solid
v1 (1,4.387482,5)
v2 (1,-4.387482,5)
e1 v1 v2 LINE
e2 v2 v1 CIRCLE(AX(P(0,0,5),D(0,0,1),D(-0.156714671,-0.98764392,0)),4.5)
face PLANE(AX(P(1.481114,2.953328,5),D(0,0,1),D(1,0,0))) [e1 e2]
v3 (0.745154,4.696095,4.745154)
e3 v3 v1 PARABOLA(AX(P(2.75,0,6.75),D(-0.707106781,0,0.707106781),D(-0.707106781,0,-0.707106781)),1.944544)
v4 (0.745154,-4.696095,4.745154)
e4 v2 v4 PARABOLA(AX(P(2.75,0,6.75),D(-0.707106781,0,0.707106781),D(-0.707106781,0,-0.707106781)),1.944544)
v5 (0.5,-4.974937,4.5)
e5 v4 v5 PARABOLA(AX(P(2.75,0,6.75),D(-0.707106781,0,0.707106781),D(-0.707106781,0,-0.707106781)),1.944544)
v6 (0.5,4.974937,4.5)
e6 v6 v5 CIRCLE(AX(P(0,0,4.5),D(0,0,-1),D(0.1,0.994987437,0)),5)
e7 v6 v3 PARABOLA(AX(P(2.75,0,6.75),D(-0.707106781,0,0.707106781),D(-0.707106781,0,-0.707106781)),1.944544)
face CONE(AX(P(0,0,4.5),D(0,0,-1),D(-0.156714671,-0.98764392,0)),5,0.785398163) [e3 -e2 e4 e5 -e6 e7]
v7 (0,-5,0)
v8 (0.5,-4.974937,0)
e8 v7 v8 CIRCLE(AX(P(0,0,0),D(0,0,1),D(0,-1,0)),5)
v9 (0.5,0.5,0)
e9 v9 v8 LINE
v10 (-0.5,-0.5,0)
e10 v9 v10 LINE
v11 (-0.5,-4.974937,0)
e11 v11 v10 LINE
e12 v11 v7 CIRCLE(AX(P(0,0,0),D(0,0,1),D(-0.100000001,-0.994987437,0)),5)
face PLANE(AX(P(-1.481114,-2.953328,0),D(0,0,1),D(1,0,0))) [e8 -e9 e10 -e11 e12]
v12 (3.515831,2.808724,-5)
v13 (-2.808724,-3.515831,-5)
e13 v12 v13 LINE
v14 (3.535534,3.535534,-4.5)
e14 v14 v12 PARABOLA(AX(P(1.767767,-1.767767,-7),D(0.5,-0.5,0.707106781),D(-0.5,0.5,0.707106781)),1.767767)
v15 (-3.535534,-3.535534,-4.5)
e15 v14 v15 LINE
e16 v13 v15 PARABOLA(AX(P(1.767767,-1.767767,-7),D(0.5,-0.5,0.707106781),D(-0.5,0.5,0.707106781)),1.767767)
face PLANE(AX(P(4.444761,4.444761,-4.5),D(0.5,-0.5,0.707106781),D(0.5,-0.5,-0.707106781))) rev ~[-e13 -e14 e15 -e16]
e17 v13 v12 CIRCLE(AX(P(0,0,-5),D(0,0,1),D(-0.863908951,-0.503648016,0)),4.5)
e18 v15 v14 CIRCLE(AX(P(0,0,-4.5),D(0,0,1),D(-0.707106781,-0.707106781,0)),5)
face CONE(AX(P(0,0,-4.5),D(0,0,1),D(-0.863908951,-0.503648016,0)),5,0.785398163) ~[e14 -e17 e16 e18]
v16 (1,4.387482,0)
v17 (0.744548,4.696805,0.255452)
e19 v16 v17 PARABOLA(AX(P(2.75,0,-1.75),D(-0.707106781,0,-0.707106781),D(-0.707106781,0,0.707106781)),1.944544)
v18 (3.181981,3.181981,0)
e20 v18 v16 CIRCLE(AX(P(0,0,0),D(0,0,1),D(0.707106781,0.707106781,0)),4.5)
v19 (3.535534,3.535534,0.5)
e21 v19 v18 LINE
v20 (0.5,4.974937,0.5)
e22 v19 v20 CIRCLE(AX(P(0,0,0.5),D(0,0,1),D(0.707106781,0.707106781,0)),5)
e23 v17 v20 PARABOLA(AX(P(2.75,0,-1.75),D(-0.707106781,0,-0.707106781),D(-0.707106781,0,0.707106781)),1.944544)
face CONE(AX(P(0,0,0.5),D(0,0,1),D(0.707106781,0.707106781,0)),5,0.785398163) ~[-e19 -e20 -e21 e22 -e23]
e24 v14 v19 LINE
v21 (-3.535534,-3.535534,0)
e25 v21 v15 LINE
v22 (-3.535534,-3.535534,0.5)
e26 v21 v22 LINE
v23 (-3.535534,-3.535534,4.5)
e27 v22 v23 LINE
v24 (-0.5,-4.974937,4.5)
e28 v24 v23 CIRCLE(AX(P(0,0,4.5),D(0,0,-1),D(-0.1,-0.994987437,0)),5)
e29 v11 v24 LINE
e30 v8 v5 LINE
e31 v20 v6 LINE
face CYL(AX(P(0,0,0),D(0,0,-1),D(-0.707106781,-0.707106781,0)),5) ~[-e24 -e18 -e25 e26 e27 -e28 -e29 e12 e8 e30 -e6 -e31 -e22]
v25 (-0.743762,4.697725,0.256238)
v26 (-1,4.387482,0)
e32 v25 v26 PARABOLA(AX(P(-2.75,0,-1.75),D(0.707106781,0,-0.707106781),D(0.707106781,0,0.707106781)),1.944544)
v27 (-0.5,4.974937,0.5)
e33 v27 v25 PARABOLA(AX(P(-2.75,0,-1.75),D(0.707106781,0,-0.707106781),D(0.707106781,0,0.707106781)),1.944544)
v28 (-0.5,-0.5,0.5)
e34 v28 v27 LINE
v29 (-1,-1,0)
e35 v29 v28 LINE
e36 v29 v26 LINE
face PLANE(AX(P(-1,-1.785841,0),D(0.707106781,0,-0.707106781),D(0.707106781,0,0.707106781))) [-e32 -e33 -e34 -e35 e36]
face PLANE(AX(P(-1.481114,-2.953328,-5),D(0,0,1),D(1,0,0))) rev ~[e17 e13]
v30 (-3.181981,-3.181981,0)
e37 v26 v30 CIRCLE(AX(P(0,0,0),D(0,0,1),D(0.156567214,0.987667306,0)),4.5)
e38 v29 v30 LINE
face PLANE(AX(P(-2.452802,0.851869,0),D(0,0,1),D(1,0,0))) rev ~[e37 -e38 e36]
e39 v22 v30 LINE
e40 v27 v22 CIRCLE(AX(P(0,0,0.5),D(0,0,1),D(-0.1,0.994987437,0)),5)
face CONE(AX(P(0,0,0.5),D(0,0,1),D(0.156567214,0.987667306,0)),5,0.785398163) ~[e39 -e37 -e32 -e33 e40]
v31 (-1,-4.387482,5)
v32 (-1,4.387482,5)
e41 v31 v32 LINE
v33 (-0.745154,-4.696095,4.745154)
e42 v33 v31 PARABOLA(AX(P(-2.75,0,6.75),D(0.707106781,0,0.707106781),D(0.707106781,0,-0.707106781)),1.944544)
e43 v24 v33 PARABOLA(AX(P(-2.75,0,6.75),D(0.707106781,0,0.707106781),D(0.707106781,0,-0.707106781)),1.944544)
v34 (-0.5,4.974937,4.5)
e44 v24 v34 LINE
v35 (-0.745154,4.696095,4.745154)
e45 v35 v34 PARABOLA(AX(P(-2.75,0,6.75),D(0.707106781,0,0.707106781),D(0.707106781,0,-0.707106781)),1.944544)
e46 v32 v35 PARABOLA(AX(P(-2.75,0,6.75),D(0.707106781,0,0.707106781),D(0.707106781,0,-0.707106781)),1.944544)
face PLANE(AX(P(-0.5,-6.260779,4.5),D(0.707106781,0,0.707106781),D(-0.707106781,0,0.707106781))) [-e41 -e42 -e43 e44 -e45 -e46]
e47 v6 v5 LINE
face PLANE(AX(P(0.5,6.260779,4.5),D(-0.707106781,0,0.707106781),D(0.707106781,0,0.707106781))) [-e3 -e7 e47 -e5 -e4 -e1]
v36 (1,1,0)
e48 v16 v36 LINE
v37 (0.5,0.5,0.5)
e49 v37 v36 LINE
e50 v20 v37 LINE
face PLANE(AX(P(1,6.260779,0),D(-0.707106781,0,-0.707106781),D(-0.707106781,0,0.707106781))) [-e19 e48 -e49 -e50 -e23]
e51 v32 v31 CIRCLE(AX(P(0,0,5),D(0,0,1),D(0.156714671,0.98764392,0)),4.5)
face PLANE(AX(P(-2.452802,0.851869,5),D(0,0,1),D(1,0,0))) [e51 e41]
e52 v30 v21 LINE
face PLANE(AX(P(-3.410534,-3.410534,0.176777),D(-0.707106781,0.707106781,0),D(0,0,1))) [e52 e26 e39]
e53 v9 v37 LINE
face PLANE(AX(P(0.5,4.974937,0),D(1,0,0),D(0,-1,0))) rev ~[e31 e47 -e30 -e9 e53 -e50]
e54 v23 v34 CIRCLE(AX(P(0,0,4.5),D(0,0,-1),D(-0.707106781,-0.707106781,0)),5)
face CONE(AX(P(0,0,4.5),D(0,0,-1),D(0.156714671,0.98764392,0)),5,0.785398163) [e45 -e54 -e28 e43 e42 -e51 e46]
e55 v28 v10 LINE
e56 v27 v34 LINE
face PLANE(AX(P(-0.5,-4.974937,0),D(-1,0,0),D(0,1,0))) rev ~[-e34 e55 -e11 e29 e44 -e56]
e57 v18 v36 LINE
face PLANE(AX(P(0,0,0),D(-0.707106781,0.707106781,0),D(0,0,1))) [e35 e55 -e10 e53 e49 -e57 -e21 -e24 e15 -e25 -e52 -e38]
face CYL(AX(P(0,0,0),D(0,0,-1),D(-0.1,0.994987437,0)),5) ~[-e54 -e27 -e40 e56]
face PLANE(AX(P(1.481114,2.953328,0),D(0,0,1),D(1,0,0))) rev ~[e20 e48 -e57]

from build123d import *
from build123d import SkipClean  # not in build123d's __all__

# Parameters (mm, degrees)
F1_DEPTH     = 5
F2_DEPTH     = 5
F3_T3_DEPTH  = 12.521557359
F3_T6_ANGLE  = 198.0325102457
F3_T9_ANGLE  = 198.0325102457
F3_T12_DEPTH = 12.521557359
F3_T15_ANGLE = 209.516708524
F3_T18_DEPTH = 12.571682988
F3_T21_ANGLE = 144.0077008654
F3_T24_ANGLE = 53.9966137912
F3_T27_DEPTH = 7.0466201735
F3_T31_DEPTH = 8.0466201735


# Not quite as in the source:
# - a fillet or chamfer that OpenCascade refuses, or shapes differently, is made with other operations: its cross-section is extruded or revolved along the edge and cut away or added


with BuildPart() as f1:
    # F0 (on Top) → F1 (new body)
    with BuildSketch(Plane.XY):
        with BuildLine():
            ThreePointArc((-3.5355339059, -3.5355339059), (-2.1422777427, -4.5178143026), (-0.5, -4.9749371855))
            Line((-0.5, -4.9749371855), (-0.5, -0.5))
            Line((-0.5, -0.5), (-3.5355339059, -3.5355339059))
        make_face()
        with BuildLine():
            ThreePointArc((-0.5, -4.9749371855), (-0.2503138753, -4.9937303656), (0, -5))
            Line((0, -5), (0, 0))
            Line((0, 0), (-0.5, -0.5))
            Line((-0.5, -0.5), (-0.5, -4.9749371855))
        make_face()
        with BuildLine():
            ThreePointArc((0, -5), (0.2503138753, -4.9937303656), (0.5, -4.9749371855))
            Line((0.5, -4.9749371855), (0.5, 0.5))
            Line((0.5, 0.5), (0, 0))
            Line((0, 0), (0, -5))
        make_face()
        with BuildLine():
            ThreePointArc((0.5, -4.9749371855), (3.7080992435, -3.3541019662), (5, 0))
            ThreePointArc((5, 0), (4.6193976626, 1.9134171618), (3.5355339059, 3.5355339059))
            Line((3.5355339059, 3.5355339059), (0.5, 0.5))
            Line((0.5, 0.5), (0.5, -4.9749371855))
        make_face()
    extrude(amount=-F1_DEPTH)

    # F0 (on Top) → F2 (join)
    with BuildSketch(Plane.XY):
        with BuildLine():
            Line((-0.5, -0.5), (-0.5, 4.9749371855))
            ThreePointArc((-0.5, 4.9749371855), (-4.7093962486, 1.6797580105), (-3.5355339059, -3.5355339059))
            Line((-3.5355339059, -3.5355339059), (-0.5, -0.5))
        make_face()
        with BuildLine():
            Line((0.5, 0.5), (3.5355339059, 3.5355339059))
            ThreePointArc((3.5355339059, 3.5355339059), (2.1422777427, 4.5178143026), (0.5, 4.9749371855))
            Line((0.5, 4.9749371855), (0.5, 0.5))
        make_face()
        with BuildLine():
            ThreePointArc((0.5, -4.9749371855), (3.7080992435, -3.3541019662), (5, 0))
            ThreePointArc((5, 0), (4.6193976626, 1.9134171618), (3.5355339059, 3.5355339059))
            Line((3.5355339059, 3.5355339059), (0.5, 0.5))
            Line((0.5, 0.5), (0.5, -4.9749371855))
        make_face()
        with BuildLine():
            ThreePointArc((-3.5355339059, -3.5355339059), (-2.1422777427, -4.5178143026), (-0.5, -4.9749371855))
            Line((-0.5, -4.9749371855), (-0.5, -0.5))
            Line((-0.5, -0.5), (-3.5355339059, -3.5355339059))
        make_face()
    with SkipClean():  # cleaning this boolean's faces spoils the solid; the shape is the same uncleaned
        extrude(amount=F2_DEPTH)

    # F3: chamfer of 0.5 on 12 edges, made by hand


with BuildPart() as f3_tool1:
    # F3_s2 → F3_t3 (new body)
    with BuildSketch(Plane.XZ.offset(-6.2607786795)):
        Polygon((0.5, 4.5), (1, 5), (0.5, 5), align=None)
    extrude(amount=F3_T3_DEPTH)


with BuildPart() as f3_tool4:
    # F3_s5 → F3_t6 (revolve)
    with BuildSketch(Plane(origin=(0, 0, 0), x_dir=(0, 0, 1), z_dir=(-0.9876439195, 0.1567146713, 0))):
        Polygon((4.5, -5), (5, -4.5), (5, -5), align=None)
    revolve(axis=Axis((0, 0, 5), (0, 0, 1)), revolution_arc=F3_T6_ANGLE)


with BuildPart() as f3_tool7:
    # F3_s8 → F3_t9 (revolve)
    with BuildSketch(Plane(origin=(0, 0, 0), x_dir=(0, 0, 1), z_dir=(0.9876439195, -0.1567146713, 0))):
        Polygon((4.5, -5), (5, -4.5), (5, -5), align=None)
    revolve(axis=Axis((0, 0, 5), (0, 0, 1)), revolution_arc=F3_T9_ANGLE)


with BuildPart() as f3_tool10:
    # F3_s11 → F3_t12 (new body)
    with BuildSketch(Plane.XZ.offset(6.2607786795)):
        Polygon((-0.5, 4.5), (-1, 5), (-0.5, 5), align=None)
    extrude(amount=-F3_T12_DEPTH)


with BuildPart() as f3_tool13:
    # F3_s14 → F3_t15 (revolve)
    with BuildSketch(Plane(origin=(0, 0, 0), x_dir=(0, 0, 1), z_dir=(-0.5036480164, 0.863908951, 0))):
        Polygon((-4.5, -5), (-5, -4.5), (-5, -5), align=None)
    revolve(axis=Axis((0, 0, -5), (0, 0, 1)), revolution_arc=F3_T15_ANGLE)


with BuildPart() as f3_tool16:
    # F3_s17 → F3_t18 (new body)
    with BuildSketch(Plane(origin=(4.4447611459, 4.4447611459, 0), x_dir=(0, 0, 1), z_dir=(-0.7071067812, -0.7071067812, 0))):
        Polygon((-4.5, 0), (-5, -0.5), (-5, 0), align=None)
    extrude(amount=F3_T18_DEPTH)


with BuildPart() as f3_tool19:
    # F3_s20 → F3_t21 (revolve)
    with BuildSketch(Plane(origin=(0, 0, 0), x_dir=(0, 0, 1), z_dir=(0.987667306, -0.1565672143, 0))):
        Polygon((0.5, -5), (0, -4.5), (0, -5), align=None)
    revolve(axis=Axis((0, 0, 0), (0, 0, 1)), revolution_arc=F3_T21_ANGLE)


with BuildPart() as f3_tool22:
    # F3_s23 → F3_t24 (revolve)
    with BuildSketch(Plane(origin=(0, 0, 0), x_dir=(0, 0, 1), z_dir=(0.7071067812, -0.7071067812, 0))):
        Polygon((0.5, -5), (0, -4.5), (0, -5), align=None)
    revolve(axis=Axis((0, 0, 0), (0, 0, 1)), revolution_arc=F3_T24_ANGLE)


with BuildPart() as f3_tool25:
    # F3_s26 → F3_t27 (new body)
    with BuildSketch(Plane.XZ.offset(-6.2607786795)):
        Polygon((1, 0), (0.5, 0.5), (0.5, 0), align=None)
    extrude(amount=F3_T27_DEPTH)

    split(bisect_by=Plane(origin=(0, 0, 0), x_dir=(0, 0, 1), z_dir=(-0.7071067812, 0.7071067812, 0)), keep=Keep.TOP)


with BuildPart() as f3_tool29:
    # F3_s30 → F3_t31 (new body)
    with BuildSketch(Plane.XZ.offset(1.785841494)):
        Polygon((-1, 0), (-0.5, 0.5), (-0.5, 0), align=None)
    extrude(amount=-F3_T31_DEPTH)

    split(bisect_by=Plane(origin=(0, 0, 0), x_dir=(0, 0, 1), z_dir=(-0.7071067812, 0.7071067812, 0)), keep=Keep.TOP)


with BuildPart() as f1_1:
    add(f1.part, clean=False)

    # F3_t33: cut F3_tool1, F3_tool4, F3_tool7, F3_tool10, F3_tool13, F3_tool16, F3_tool19, F3_tool22, F3_tool25, F3_tool29
    add([f3_tool1.part, f3_tool4.part, f3_tool7.part, f3_tool10.part, f3_tool13.part, f3_tool16.part, f3_tool19.part, f3_tool22.part, f3_tool25.part, f3_tool29.part], mode=Mode.SUBTRACT)


solid = f1_1.part
